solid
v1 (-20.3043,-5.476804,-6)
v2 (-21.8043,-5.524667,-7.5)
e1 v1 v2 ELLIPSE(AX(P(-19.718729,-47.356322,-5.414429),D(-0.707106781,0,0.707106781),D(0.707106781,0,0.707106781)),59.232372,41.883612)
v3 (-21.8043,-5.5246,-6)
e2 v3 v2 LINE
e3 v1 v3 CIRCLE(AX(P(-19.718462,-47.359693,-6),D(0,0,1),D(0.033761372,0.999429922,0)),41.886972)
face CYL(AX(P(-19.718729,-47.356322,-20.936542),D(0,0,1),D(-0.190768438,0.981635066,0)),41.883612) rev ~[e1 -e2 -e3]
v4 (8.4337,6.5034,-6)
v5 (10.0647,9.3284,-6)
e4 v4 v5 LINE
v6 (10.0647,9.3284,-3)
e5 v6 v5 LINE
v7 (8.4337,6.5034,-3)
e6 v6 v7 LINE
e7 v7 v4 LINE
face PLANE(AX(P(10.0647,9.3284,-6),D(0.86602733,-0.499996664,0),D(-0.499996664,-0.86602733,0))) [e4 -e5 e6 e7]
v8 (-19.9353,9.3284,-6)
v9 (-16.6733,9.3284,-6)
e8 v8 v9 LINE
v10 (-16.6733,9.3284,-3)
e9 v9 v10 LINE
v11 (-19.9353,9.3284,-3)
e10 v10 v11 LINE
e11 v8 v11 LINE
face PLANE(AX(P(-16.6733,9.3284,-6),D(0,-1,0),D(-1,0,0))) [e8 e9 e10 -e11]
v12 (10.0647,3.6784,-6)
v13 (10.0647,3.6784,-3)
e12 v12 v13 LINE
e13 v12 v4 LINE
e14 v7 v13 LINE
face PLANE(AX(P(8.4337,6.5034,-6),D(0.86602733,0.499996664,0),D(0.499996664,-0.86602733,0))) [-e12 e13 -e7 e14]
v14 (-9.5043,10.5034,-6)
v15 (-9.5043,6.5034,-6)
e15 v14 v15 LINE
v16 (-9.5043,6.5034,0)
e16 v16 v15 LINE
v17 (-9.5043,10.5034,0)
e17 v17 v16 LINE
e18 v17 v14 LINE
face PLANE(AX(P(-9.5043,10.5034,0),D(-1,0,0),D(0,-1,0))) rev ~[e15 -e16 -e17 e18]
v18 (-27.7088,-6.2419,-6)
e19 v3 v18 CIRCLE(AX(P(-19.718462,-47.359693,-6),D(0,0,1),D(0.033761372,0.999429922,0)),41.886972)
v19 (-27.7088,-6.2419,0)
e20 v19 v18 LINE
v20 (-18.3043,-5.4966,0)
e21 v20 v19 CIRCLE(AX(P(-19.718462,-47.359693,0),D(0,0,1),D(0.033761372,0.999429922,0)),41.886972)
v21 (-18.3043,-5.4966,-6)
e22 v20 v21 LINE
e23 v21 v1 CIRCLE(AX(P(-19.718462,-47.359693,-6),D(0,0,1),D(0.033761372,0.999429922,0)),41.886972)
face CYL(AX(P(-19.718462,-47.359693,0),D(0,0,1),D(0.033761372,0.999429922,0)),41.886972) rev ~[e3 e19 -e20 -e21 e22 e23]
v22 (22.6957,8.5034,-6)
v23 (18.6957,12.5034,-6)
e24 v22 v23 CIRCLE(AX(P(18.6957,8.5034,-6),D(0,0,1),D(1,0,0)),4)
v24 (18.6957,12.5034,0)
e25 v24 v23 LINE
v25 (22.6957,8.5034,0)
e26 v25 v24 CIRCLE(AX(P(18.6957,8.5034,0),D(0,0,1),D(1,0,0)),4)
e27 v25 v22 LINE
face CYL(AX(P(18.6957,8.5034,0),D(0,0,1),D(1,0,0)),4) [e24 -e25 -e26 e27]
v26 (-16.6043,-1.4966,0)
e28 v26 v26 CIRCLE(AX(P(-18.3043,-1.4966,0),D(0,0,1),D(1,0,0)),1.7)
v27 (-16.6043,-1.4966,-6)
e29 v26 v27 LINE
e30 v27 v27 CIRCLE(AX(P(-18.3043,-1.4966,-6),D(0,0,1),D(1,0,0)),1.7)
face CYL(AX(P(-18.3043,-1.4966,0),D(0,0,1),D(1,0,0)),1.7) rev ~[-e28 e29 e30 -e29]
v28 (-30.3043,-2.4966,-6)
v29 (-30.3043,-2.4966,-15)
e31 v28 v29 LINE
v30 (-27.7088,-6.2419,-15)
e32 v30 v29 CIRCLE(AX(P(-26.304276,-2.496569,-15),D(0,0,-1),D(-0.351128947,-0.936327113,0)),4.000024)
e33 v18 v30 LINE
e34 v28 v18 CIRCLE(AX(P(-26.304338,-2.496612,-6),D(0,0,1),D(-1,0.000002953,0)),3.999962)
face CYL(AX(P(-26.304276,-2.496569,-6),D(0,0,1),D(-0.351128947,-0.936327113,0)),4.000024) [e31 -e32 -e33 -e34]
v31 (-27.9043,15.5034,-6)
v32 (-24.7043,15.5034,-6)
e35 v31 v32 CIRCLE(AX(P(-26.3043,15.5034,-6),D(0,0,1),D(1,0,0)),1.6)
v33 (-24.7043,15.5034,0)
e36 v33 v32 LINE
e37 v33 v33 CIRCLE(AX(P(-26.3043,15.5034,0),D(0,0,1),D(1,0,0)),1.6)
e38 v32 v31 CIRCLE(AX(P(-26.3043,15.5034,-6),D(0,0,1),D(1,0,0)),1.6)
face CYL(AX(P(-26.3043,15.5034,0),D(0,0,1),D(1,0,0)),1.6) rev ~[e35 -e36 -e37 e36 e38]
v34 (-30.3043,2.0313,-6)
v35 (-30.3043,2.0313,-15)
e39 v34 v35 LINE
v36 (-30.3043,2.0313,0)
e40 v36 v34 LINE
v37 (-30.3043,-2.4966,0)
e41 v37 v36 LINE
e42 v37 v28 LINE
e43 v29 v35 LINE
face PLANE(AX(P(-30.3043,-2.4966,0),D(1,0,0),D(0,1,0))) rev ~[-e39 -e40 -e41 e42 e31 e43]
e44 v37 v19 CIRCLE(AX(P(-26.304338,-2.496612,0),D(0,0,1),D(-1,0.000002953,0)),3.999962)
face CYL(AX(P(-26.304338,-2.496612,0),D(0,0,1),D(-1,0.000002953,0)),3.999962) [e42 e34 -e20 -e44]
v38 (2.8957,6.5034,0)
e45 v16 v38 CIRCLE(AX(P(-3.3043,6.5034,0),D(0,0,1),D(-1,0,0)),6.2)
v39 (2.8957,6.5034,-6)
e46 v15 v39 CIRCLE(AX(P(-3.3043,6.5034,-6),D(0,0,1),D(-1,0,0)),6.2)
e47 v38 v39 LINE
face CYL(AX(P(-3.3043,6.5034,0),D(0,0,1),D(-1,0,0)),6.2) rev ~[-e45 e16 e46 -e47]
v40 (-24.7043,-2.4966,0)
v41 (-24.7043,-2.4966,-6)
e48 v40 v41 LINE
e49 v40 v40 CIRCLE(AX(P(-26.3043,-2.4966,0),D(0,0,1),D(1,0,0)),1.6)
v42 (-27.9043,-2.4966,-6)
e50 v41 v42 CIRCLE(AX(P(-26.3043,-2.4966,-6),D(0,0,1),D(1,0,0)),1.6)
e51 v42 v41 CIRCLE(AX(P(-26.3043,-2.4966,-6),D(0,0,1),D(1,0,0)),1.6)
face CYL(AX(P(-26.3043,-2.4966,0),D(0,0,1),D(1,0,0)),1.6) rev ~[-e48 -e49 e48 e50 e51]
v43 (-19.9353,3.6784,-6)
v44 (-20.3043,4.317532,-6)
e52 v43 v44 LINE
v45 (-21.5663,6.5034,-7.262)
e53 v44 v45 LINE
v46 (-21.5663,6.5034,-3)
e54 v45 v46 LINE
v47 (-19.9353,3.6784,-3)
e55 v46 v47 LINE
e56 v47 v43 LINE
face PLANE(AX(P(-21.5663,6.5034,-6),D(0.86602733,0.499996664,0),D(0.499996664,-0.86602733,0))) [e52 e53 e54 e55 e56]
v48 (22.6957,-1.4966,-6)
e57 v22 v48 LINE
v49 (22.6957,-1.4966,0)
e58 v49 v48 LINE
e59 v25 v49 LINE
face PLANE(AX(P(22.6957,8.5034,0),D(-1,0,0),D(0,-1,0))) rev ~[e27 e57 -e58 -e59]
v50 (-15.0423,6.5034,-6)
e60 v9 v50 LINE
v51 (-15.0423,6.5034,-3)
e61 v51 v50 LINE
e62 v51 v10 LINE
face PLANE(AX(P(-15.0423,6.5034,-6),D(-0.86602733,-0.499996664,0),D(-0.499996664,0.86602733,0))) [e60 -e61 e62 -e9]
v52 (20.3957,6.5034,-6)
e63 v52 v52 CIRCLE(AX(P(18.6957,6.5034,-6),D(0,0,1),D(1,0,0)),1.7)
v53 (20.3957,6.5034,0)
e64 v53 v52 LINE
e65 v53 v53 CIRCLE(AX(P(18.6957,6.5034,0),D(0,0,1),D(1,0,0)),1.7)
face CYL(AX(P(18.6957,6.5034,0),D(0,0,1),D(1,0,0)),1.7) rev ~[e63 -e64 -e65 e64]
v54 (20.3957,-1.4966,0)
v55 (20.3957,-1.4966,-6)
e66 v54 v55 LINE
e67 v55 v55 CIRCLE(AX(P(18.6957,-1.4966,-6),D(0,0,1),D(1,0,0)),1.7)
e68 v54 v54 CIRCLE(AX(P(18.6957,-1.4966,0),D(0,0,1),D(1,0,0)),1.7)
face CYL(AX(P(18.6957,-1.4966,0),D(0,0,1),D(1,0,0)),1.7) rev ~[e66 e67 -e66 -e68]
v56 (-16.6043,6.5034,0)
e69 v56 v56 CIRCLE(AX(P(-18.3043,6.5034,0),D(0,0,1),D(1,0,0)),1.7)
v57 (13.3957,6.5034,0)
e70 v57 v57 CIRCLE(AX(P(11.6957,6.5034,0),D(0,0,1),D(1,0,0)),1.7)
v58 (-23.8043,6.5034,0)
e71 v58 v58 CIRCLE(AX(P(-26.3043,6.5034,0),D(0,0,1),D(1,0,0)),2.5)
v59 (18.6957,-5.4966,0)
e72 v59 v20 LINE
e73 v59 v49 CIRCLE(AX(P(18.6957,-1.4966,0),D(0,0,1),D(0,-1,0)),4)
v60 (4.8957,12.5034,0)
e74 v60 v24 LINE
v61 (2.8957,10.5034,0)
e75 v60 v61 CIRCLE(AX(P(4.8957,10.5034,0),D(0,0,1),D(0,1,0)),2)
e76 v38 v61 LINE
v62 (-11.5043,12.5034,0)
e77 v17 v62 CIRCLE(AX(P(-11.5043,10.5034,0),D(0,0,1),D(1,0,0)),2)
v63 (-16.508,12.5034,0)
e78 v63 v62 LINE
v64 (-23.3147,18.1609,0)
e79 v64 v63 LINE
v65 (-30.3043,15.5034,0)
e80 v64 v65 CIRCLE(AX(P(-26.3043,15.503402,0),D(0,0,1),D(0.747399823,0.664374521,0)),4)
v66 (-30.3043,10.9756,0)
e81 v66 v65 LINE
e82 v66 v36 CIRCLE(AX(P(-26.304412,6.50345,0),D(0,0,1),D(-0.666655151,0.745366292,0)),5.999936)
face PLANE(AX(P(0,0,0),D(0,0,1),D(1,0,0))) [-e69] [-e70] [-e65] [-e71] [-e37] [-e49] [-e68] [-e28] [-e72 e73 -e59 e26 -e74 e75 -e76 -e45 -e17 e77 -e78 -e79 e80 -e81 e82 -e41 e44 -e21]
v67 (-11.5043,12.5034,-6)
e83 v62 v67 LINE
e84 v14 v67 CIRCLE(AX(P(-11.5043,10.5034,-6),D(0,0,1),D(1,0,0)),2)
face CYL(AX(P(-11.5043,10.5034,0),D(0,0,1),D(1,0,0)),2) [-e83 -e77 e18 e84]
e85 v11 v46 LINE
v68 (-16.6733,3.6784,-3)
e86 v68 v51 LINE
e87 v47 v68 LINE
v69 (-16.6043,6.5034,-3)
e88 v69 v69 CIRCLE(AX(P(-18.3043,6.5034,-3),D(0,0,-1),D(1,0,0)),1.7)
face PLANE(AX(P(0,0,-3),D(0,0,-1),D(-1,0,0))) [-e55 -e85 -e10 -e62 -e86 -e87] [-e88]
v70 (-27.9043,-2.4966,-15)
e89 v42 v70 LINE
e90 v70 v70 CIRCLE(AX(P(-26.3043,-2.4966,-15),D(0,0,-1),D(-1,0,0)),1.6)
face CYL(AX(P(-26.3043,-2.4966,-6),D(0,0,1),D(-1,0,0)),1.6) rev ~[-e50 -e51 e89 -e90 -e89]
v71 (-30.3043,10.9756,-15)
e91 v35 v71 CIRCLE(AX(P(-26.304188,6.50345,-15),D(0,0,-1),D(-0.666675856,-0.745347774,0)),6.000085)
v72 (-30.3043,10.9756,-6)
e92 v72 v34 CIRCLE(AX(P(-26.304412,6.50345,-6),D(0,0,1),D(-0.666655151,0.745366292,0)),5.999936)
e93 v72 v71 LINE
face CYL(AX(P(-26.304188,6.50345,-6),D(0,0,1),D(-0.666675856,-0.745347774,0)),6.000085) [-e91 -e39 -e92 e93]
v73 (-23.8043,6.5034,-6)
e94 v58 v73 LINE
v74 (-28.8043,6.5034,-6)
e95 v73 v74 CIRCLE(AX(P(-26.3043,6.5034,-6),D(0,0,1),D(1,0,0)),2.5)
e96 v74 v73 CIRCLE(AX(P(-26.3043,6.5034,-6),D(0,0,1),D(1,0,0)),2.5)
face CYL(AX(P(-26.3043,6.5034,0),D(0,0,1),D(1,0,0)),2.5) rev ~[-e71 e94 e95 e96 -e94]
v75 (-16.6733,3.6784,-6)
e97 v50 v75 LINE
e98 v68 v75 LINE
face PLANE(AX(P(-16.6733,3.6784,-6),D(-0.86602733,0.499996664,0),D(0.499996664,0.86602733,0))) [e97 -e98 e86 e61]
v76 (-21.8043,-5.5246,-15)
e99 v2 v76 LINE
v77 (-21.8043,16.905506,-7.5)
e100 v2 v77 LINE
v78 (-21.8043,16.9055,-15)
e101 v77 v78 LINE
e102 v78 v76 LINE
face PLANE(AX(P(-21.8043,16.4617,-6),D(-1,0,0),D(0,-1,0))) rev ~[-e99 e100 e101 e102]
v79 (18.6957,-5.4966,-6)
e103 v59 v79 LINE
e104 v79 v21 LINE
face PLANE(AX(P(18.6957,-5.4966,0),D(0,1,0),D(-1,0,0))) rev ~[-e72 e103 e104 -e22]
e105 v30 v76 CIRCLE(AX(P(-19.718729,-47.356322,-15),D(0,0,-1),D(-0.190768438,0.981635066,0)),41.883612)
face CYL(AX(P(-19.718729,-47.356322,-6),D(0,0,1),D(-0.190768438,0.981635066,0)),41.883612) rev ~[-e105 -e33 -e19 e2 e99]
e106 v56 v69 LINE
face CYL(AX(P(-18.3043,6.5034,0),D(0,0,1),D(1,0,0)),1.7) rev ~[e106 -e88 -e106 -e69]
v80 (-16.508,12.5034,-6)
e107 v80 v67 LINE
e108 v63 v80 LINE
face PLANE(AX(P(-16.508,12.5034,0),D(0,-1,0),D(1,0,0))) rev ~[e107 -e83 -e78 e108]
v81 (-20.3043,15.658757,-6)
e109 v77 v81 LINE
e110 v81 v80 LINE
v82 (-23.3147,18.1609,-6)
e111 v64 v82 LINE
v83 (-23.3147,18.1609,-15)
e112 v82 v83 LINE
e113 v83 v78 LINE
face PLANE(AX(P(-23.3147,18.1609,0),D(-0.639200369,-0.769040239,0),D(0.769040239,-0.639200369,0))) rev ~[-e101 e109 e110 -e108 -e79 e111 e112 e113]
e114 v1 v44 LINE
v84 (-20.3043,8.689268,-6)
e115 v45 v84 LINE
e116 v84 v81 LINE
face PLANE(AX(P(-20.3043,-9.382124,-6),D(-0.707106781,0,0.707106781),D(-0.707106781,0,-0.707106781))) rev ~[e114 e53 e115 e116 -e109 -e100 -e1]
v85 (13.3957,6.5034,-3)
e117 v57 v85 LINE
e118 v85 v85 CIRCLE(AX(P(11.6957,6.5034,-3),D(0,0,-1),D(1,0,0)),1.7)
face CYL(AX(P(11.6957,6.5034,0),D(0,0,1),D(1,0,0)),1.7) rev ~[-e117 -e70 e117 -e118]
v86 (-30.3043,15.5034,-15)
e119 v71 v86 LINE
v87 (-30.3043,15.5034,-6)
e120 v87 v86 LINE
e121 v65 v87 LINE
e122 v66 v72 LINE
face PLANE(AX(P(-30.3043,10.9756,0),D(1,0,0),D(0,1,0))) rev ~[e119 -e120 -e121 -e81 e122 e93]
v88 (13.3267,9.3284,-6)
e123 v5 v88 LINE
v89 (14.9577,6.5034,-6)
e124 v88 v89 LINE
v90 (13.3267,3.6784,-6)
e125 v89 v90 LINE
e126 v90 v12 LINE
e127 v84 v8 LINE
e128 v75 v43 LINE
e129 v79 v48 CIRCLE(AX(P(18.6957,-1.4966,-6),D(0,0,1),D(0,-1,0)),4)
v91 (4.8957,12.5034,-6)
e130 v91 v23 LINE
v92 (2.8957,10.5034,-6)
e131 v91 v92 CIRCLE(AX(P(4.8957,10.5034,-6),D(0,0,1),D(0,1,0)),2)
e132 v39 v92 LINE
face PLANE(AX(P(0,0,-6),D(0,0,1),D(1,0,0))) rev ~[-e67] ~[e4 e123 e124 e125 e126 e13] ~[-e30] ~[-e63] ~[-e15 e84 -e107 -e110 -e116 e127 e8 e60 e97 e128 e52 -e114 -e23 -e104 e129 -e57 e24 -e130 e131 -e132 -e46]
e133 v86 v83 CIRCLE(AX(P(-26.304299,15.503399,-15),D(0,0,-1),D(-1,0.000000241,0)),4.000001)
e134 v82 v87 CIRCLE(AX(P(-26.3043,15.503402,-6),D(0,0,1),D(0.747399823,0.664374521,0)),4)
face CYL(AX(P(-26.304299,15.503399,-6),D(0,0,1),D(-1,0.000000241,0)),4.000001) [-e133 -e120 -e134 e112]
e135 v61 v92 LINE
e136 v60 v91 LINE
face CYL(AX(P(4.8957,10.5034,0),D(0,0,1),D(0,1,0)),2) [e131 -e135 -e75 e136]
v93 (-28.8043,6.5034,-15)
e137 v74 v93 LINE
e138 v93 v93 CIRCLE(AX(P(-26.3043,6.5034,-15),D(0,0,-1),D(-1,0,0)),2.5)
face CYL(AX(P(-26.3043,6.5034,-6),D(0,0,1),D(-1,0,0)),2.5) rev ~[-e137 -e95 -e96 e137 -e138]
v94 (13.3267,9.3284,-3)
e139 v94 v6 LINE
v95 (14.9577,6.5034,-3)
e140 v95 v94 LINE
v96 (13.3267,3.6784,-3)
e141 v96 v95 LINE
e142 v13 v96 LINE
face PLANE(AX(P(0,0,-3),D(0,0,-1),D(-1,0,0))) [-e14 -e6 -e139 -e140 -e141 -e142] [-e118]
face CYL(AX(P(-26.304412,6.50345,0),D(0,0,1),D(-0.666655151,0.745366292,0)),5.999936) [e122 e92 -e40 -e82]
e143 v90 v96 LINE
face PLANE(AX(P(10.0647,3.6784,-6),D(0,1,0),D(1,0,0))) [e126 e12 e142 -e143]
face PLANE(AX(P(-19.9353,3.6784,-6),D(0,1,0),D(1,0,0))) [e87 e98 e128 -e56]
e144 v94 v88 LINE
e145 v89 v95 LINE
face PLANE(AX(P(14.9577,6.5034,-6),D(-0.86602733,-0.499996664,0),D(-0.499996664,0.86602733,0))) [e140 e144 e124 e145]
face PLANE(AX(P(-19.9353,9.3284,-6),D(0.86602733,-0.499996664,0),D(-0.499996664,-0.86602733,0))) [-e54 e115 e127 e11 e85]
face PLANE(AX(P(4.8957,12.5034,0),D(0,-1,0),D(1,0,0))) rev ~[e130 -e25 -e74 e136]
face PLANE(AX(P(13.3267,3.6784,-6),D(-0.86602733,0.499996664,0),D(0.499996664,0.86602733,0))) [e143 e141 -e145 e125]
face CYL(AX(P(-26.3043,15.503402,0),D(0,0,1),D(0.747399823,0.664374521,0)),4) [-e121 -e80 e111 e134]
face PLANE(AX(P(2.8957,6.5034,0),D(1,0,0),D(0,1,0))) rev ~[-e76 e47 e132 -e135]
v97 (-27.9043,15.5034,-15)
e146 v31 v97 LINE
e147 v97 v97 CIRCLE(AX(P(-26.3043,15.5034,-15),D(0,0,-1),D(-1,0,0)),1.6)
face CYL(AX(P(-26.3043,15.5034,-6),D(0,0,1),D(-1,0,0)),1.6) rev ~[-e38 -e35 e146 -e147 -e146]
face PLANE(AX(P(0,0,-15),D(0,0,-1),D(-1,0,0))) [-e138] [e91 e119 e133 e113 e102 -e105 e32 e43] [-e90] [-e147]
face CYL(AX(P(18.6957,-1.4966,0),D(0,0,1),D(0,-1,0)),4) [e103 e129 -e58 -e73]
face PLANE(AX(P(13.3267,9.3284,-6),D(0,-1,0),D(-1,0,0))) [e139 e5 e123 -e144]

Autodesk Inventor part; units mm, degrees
ref_plane "YZ Plane" through (0, 0, 0) normal (1, 0, 0) x (0, 1, 0)
ref_plane "XZ Plane" through (0, 0, 0) normal (0, 1, 0) x (-1, 0, 0)
ref_plane "XY Plane" through (0, 0, 0) normal (0, 0, 1) x (1, 0, 0)
sketch "Sketch1" plane through (0, 0, 0) normal (0, 0, 1) x (1, 0, 0)
  circle A0 centre (-18.3043, -1.4966) radius 1.7
  circle A1 centre (18.6957, -1.4966) radius 1.7
  circle A2 centre (18.6957, 6.5034) radius 1.7 projected
  circle A3 centre (-18.3043, 6.5034) radius 1.7 projected
  circle A4 centre (11.6957, 6.5034) radius 1.7 projected
  arc A5 (22.6957, 8.5034) -> (18.6957, 12.5034) centre (18.6957, 8.5034) ccw
  line L0 (4.8957, 12.5034) -> (18.6957, 12.5034)
  arc A6 (4.8957, 12.5034) -> (2.8957, 10.5034) centre (4.8957, 10.5034) ccw
  line L1 (2.8957, 6.5034) -> (2.8957, 10.5034)
  arc A7 (-9.5043, 6.5034) -> (2.8957, 6.5034) centre (-3.3043, 6.5034) ccw projected
  line L2 (-9.5043, 10.5034) -> (-9.5043, 6.5034)
  arc A8 (-9.5043, 10.5034) -> (-11.5043, 12.5034) centre (-11.5043, 10.5034) ccw
  line L3 (-16.508, 12.5034) -> (-11.5043, 12.5034)
  line L4 (18.6957, -5.4966) -> (-18.3043, -5.4966)
  circle A9 centre (-18.3043, 6.5034) radius 1.7 projected
  circle A10 centre (-26.3043, -2.4966) radius 1.6 projected
  circle A11 centre (-26.3043, 15.5034) radius 1.6 projected
  line L5 (-23.3147, 18.1609) -> (-16.508, 12.5034)
  arc A12 (-23.3147, 18.1609) -> (-30.3043, 15.5034) centre (-26.3043, 15.5034) ccw projected
  line L6 (-30.3043, 10.9756) -> (-30.3043, 15.5034) projected
  arc A13 (-30.3043, 10.9756) -> (-30.3043, 2.0313) centre (-26.3043, 6.5034) ccw projected
  line L7 (-30.3043, -2.4966) -> (-30.3043, 2.0313) projected
  arc A14 (-30.3043, -2.4966) -> (-27.7088, -6.2419) centre (-26.3043, -2.4966) ccw projected
  circle A15 centre (-26.3043, 6.5034) radius 2.5 projected
  arc A16 (-18.3043, -5.4966) -> (-27.7088, -6.2419) centre (-19.7185, -47.358) ccw
  line L8 (22.6957, 8.5034) -> (22.6957, -1.4966)
  arc A17 (18.6957, -5.4966) -> (22.6957, -1.4966) centre (18.6957, -1.4966) ccw
  point P0 (0, 0)
  point P1 (-18.3043, 6.5034)
  dimension "d14" = 12
  dimension "d17" = 8
  dimension "d18" = 4
  dimension "d24" = 6
  dimension "d25" = 2
  dimension "d26" = 2
  dimension "d27" = 2
  dimension "d28" = 2
extrude "Extrusion1" add sketch "Sketch1" against normal blind 6
sketch "Sketch2" plane through (0, 0, -6) normal (0, 0, -1) x (-1, 0, 0)
  circle A0 centre (26.3043, -2.4966) radius 1.6 projected
  circle A1 centre (26.3043, 15.5034) radius 1.6 projected
  circle A2 centre (26.3043, 6.5034) radius 2.5 projected
  arc A3 (30.3043, 15.5034) -> (23.3147, 18.1609) centre (26.3043, 15.5034) ccw projected
  circle A4 centre (18.3043, 6.5034) radius 1.7 projected
  circle A5 centre (18.3043, -5.4966) radius 1.7 projected
  circle A6 centre (26.3043, -2.4966) radius 1.6 projected
  circle A7 centre (26.3043, 15.5034) radius 1.6 projected
  line L0 (14.3043, 6.5034) -> (14.3043, -5.4966) projected
  arc A8 (14.3043, -5.4966) -> (19.7088, -9.2419) centre (18.3043, -5.4966) ccw projected
  line L1 (19.7088, -9.2419) -> (27.7088, -6.2419) projected
  arc A9 (27.7088, -6.2419) -> (30.3043, -2.4966) centre (26.3043, -2.4966) ccw projected
  line L2 (30.3043, -2.4966) -> (30.3043, 2.0313) projected
  arc A10 (30.3043, 2.0313) -> (30.3043, 10.9756) centre (26.3043, 6.5034) ccw projected
  line L3 (30.3043, 10.9756) -> (30.3043, 15.5034) projected
  arc A11 (30.3043, 15.5034) -> (23.3147, 18.1609) centre (26.3043, 15.5034) ccw projected
  line L4 (23.3147, 18.1609) -> (15.3147, 9.1609) projected
  arc A12 (15.3147, 9.1609) -> (14.3043, 6.5034) centre (18.3043, 6.5034) ccw projected
  line L5 (18.3043, 12.5242) -> (23.3147, 18.1609) construction
  arc A13 (27.7088, -6.2419) -> (18.3043, -5.4966) centre (19.7185, -47.358) ccw projected
  line L6 (23.3147, 18.1609) -> (16.508, 12.5034) projected
  line L7 (-4.8957, 12.5034) -> (-18.6957, 12.5034) projected
  line L8 (21.8043, 16.9055) -> (21.8043, -5.5246)
  line L9 (25.163, -7.1966) -> (21.8043, -5.5246)
  circle A14 centre (18.3043, 6.5034) radius 1.7 projected
  point P0 (0, 0)
  dimension "d22" = 3.5
extrude "Extrusion2" add sketch "Sketch2" along normal blind 9 contours L3 A10 L2 A9 A13 L8 L4 A3 | L4 L8 L6
chamfer "Chamfer1" distance 1.5 angle 45 1 edges at (-21.8043, 5.6904, -6)
sketch "Sketch4" plane through (0, 0, -6) normal (0, 0, -1) x (-1, 0, 0)
  circle A0 centre (-11.6957, 6.5034) radius 1.7 projected
  circle A1 centre (18.3043, 6.5034) radius 1.7 projected
  line L0 (-8.4337, 6.5034) -> (-10.0647, 3.6784)
  line L1 (-10.0647, 3.6784) -> (-13.3267, 3.6784)
  line L2 (-13.3267, 3.6784) -> (-14.9577, 6.5034)
  line L3 (-14.9577, 6.5034) -> (-13.3267, 9.3284)
  line L4 (-13.3267, 9.3284) -> (-10.0647, 9.3284)
  line L5 (-10.0647, 9.3284) -> (-8.4337, 6.5034)
  line L6 (15.0423, 6.5034) -> (16.6733, 9.3284)
  line L7 (16.6733, 9.3284) -> (19.9353, 9.3284)
  line L8 (19.9353, 9.3284) -> (21.5663, 6.5034)
  line L9 (21.5663, 6.5034) -> (19.9353, 3.6784)
  line L10 (19.9353, 3.6784) -> (16.6733, 3.6784)
  line L11 (16.6733, 3.6784) -> (15.0423, 6.5034)
  dimension "d21" = 5.65
extrude "Extrusion3" cut sketch "Sketch4" against normal blind 3 and the other way blind 5
properties part number "Extruder_Fixer_BLTouch"
